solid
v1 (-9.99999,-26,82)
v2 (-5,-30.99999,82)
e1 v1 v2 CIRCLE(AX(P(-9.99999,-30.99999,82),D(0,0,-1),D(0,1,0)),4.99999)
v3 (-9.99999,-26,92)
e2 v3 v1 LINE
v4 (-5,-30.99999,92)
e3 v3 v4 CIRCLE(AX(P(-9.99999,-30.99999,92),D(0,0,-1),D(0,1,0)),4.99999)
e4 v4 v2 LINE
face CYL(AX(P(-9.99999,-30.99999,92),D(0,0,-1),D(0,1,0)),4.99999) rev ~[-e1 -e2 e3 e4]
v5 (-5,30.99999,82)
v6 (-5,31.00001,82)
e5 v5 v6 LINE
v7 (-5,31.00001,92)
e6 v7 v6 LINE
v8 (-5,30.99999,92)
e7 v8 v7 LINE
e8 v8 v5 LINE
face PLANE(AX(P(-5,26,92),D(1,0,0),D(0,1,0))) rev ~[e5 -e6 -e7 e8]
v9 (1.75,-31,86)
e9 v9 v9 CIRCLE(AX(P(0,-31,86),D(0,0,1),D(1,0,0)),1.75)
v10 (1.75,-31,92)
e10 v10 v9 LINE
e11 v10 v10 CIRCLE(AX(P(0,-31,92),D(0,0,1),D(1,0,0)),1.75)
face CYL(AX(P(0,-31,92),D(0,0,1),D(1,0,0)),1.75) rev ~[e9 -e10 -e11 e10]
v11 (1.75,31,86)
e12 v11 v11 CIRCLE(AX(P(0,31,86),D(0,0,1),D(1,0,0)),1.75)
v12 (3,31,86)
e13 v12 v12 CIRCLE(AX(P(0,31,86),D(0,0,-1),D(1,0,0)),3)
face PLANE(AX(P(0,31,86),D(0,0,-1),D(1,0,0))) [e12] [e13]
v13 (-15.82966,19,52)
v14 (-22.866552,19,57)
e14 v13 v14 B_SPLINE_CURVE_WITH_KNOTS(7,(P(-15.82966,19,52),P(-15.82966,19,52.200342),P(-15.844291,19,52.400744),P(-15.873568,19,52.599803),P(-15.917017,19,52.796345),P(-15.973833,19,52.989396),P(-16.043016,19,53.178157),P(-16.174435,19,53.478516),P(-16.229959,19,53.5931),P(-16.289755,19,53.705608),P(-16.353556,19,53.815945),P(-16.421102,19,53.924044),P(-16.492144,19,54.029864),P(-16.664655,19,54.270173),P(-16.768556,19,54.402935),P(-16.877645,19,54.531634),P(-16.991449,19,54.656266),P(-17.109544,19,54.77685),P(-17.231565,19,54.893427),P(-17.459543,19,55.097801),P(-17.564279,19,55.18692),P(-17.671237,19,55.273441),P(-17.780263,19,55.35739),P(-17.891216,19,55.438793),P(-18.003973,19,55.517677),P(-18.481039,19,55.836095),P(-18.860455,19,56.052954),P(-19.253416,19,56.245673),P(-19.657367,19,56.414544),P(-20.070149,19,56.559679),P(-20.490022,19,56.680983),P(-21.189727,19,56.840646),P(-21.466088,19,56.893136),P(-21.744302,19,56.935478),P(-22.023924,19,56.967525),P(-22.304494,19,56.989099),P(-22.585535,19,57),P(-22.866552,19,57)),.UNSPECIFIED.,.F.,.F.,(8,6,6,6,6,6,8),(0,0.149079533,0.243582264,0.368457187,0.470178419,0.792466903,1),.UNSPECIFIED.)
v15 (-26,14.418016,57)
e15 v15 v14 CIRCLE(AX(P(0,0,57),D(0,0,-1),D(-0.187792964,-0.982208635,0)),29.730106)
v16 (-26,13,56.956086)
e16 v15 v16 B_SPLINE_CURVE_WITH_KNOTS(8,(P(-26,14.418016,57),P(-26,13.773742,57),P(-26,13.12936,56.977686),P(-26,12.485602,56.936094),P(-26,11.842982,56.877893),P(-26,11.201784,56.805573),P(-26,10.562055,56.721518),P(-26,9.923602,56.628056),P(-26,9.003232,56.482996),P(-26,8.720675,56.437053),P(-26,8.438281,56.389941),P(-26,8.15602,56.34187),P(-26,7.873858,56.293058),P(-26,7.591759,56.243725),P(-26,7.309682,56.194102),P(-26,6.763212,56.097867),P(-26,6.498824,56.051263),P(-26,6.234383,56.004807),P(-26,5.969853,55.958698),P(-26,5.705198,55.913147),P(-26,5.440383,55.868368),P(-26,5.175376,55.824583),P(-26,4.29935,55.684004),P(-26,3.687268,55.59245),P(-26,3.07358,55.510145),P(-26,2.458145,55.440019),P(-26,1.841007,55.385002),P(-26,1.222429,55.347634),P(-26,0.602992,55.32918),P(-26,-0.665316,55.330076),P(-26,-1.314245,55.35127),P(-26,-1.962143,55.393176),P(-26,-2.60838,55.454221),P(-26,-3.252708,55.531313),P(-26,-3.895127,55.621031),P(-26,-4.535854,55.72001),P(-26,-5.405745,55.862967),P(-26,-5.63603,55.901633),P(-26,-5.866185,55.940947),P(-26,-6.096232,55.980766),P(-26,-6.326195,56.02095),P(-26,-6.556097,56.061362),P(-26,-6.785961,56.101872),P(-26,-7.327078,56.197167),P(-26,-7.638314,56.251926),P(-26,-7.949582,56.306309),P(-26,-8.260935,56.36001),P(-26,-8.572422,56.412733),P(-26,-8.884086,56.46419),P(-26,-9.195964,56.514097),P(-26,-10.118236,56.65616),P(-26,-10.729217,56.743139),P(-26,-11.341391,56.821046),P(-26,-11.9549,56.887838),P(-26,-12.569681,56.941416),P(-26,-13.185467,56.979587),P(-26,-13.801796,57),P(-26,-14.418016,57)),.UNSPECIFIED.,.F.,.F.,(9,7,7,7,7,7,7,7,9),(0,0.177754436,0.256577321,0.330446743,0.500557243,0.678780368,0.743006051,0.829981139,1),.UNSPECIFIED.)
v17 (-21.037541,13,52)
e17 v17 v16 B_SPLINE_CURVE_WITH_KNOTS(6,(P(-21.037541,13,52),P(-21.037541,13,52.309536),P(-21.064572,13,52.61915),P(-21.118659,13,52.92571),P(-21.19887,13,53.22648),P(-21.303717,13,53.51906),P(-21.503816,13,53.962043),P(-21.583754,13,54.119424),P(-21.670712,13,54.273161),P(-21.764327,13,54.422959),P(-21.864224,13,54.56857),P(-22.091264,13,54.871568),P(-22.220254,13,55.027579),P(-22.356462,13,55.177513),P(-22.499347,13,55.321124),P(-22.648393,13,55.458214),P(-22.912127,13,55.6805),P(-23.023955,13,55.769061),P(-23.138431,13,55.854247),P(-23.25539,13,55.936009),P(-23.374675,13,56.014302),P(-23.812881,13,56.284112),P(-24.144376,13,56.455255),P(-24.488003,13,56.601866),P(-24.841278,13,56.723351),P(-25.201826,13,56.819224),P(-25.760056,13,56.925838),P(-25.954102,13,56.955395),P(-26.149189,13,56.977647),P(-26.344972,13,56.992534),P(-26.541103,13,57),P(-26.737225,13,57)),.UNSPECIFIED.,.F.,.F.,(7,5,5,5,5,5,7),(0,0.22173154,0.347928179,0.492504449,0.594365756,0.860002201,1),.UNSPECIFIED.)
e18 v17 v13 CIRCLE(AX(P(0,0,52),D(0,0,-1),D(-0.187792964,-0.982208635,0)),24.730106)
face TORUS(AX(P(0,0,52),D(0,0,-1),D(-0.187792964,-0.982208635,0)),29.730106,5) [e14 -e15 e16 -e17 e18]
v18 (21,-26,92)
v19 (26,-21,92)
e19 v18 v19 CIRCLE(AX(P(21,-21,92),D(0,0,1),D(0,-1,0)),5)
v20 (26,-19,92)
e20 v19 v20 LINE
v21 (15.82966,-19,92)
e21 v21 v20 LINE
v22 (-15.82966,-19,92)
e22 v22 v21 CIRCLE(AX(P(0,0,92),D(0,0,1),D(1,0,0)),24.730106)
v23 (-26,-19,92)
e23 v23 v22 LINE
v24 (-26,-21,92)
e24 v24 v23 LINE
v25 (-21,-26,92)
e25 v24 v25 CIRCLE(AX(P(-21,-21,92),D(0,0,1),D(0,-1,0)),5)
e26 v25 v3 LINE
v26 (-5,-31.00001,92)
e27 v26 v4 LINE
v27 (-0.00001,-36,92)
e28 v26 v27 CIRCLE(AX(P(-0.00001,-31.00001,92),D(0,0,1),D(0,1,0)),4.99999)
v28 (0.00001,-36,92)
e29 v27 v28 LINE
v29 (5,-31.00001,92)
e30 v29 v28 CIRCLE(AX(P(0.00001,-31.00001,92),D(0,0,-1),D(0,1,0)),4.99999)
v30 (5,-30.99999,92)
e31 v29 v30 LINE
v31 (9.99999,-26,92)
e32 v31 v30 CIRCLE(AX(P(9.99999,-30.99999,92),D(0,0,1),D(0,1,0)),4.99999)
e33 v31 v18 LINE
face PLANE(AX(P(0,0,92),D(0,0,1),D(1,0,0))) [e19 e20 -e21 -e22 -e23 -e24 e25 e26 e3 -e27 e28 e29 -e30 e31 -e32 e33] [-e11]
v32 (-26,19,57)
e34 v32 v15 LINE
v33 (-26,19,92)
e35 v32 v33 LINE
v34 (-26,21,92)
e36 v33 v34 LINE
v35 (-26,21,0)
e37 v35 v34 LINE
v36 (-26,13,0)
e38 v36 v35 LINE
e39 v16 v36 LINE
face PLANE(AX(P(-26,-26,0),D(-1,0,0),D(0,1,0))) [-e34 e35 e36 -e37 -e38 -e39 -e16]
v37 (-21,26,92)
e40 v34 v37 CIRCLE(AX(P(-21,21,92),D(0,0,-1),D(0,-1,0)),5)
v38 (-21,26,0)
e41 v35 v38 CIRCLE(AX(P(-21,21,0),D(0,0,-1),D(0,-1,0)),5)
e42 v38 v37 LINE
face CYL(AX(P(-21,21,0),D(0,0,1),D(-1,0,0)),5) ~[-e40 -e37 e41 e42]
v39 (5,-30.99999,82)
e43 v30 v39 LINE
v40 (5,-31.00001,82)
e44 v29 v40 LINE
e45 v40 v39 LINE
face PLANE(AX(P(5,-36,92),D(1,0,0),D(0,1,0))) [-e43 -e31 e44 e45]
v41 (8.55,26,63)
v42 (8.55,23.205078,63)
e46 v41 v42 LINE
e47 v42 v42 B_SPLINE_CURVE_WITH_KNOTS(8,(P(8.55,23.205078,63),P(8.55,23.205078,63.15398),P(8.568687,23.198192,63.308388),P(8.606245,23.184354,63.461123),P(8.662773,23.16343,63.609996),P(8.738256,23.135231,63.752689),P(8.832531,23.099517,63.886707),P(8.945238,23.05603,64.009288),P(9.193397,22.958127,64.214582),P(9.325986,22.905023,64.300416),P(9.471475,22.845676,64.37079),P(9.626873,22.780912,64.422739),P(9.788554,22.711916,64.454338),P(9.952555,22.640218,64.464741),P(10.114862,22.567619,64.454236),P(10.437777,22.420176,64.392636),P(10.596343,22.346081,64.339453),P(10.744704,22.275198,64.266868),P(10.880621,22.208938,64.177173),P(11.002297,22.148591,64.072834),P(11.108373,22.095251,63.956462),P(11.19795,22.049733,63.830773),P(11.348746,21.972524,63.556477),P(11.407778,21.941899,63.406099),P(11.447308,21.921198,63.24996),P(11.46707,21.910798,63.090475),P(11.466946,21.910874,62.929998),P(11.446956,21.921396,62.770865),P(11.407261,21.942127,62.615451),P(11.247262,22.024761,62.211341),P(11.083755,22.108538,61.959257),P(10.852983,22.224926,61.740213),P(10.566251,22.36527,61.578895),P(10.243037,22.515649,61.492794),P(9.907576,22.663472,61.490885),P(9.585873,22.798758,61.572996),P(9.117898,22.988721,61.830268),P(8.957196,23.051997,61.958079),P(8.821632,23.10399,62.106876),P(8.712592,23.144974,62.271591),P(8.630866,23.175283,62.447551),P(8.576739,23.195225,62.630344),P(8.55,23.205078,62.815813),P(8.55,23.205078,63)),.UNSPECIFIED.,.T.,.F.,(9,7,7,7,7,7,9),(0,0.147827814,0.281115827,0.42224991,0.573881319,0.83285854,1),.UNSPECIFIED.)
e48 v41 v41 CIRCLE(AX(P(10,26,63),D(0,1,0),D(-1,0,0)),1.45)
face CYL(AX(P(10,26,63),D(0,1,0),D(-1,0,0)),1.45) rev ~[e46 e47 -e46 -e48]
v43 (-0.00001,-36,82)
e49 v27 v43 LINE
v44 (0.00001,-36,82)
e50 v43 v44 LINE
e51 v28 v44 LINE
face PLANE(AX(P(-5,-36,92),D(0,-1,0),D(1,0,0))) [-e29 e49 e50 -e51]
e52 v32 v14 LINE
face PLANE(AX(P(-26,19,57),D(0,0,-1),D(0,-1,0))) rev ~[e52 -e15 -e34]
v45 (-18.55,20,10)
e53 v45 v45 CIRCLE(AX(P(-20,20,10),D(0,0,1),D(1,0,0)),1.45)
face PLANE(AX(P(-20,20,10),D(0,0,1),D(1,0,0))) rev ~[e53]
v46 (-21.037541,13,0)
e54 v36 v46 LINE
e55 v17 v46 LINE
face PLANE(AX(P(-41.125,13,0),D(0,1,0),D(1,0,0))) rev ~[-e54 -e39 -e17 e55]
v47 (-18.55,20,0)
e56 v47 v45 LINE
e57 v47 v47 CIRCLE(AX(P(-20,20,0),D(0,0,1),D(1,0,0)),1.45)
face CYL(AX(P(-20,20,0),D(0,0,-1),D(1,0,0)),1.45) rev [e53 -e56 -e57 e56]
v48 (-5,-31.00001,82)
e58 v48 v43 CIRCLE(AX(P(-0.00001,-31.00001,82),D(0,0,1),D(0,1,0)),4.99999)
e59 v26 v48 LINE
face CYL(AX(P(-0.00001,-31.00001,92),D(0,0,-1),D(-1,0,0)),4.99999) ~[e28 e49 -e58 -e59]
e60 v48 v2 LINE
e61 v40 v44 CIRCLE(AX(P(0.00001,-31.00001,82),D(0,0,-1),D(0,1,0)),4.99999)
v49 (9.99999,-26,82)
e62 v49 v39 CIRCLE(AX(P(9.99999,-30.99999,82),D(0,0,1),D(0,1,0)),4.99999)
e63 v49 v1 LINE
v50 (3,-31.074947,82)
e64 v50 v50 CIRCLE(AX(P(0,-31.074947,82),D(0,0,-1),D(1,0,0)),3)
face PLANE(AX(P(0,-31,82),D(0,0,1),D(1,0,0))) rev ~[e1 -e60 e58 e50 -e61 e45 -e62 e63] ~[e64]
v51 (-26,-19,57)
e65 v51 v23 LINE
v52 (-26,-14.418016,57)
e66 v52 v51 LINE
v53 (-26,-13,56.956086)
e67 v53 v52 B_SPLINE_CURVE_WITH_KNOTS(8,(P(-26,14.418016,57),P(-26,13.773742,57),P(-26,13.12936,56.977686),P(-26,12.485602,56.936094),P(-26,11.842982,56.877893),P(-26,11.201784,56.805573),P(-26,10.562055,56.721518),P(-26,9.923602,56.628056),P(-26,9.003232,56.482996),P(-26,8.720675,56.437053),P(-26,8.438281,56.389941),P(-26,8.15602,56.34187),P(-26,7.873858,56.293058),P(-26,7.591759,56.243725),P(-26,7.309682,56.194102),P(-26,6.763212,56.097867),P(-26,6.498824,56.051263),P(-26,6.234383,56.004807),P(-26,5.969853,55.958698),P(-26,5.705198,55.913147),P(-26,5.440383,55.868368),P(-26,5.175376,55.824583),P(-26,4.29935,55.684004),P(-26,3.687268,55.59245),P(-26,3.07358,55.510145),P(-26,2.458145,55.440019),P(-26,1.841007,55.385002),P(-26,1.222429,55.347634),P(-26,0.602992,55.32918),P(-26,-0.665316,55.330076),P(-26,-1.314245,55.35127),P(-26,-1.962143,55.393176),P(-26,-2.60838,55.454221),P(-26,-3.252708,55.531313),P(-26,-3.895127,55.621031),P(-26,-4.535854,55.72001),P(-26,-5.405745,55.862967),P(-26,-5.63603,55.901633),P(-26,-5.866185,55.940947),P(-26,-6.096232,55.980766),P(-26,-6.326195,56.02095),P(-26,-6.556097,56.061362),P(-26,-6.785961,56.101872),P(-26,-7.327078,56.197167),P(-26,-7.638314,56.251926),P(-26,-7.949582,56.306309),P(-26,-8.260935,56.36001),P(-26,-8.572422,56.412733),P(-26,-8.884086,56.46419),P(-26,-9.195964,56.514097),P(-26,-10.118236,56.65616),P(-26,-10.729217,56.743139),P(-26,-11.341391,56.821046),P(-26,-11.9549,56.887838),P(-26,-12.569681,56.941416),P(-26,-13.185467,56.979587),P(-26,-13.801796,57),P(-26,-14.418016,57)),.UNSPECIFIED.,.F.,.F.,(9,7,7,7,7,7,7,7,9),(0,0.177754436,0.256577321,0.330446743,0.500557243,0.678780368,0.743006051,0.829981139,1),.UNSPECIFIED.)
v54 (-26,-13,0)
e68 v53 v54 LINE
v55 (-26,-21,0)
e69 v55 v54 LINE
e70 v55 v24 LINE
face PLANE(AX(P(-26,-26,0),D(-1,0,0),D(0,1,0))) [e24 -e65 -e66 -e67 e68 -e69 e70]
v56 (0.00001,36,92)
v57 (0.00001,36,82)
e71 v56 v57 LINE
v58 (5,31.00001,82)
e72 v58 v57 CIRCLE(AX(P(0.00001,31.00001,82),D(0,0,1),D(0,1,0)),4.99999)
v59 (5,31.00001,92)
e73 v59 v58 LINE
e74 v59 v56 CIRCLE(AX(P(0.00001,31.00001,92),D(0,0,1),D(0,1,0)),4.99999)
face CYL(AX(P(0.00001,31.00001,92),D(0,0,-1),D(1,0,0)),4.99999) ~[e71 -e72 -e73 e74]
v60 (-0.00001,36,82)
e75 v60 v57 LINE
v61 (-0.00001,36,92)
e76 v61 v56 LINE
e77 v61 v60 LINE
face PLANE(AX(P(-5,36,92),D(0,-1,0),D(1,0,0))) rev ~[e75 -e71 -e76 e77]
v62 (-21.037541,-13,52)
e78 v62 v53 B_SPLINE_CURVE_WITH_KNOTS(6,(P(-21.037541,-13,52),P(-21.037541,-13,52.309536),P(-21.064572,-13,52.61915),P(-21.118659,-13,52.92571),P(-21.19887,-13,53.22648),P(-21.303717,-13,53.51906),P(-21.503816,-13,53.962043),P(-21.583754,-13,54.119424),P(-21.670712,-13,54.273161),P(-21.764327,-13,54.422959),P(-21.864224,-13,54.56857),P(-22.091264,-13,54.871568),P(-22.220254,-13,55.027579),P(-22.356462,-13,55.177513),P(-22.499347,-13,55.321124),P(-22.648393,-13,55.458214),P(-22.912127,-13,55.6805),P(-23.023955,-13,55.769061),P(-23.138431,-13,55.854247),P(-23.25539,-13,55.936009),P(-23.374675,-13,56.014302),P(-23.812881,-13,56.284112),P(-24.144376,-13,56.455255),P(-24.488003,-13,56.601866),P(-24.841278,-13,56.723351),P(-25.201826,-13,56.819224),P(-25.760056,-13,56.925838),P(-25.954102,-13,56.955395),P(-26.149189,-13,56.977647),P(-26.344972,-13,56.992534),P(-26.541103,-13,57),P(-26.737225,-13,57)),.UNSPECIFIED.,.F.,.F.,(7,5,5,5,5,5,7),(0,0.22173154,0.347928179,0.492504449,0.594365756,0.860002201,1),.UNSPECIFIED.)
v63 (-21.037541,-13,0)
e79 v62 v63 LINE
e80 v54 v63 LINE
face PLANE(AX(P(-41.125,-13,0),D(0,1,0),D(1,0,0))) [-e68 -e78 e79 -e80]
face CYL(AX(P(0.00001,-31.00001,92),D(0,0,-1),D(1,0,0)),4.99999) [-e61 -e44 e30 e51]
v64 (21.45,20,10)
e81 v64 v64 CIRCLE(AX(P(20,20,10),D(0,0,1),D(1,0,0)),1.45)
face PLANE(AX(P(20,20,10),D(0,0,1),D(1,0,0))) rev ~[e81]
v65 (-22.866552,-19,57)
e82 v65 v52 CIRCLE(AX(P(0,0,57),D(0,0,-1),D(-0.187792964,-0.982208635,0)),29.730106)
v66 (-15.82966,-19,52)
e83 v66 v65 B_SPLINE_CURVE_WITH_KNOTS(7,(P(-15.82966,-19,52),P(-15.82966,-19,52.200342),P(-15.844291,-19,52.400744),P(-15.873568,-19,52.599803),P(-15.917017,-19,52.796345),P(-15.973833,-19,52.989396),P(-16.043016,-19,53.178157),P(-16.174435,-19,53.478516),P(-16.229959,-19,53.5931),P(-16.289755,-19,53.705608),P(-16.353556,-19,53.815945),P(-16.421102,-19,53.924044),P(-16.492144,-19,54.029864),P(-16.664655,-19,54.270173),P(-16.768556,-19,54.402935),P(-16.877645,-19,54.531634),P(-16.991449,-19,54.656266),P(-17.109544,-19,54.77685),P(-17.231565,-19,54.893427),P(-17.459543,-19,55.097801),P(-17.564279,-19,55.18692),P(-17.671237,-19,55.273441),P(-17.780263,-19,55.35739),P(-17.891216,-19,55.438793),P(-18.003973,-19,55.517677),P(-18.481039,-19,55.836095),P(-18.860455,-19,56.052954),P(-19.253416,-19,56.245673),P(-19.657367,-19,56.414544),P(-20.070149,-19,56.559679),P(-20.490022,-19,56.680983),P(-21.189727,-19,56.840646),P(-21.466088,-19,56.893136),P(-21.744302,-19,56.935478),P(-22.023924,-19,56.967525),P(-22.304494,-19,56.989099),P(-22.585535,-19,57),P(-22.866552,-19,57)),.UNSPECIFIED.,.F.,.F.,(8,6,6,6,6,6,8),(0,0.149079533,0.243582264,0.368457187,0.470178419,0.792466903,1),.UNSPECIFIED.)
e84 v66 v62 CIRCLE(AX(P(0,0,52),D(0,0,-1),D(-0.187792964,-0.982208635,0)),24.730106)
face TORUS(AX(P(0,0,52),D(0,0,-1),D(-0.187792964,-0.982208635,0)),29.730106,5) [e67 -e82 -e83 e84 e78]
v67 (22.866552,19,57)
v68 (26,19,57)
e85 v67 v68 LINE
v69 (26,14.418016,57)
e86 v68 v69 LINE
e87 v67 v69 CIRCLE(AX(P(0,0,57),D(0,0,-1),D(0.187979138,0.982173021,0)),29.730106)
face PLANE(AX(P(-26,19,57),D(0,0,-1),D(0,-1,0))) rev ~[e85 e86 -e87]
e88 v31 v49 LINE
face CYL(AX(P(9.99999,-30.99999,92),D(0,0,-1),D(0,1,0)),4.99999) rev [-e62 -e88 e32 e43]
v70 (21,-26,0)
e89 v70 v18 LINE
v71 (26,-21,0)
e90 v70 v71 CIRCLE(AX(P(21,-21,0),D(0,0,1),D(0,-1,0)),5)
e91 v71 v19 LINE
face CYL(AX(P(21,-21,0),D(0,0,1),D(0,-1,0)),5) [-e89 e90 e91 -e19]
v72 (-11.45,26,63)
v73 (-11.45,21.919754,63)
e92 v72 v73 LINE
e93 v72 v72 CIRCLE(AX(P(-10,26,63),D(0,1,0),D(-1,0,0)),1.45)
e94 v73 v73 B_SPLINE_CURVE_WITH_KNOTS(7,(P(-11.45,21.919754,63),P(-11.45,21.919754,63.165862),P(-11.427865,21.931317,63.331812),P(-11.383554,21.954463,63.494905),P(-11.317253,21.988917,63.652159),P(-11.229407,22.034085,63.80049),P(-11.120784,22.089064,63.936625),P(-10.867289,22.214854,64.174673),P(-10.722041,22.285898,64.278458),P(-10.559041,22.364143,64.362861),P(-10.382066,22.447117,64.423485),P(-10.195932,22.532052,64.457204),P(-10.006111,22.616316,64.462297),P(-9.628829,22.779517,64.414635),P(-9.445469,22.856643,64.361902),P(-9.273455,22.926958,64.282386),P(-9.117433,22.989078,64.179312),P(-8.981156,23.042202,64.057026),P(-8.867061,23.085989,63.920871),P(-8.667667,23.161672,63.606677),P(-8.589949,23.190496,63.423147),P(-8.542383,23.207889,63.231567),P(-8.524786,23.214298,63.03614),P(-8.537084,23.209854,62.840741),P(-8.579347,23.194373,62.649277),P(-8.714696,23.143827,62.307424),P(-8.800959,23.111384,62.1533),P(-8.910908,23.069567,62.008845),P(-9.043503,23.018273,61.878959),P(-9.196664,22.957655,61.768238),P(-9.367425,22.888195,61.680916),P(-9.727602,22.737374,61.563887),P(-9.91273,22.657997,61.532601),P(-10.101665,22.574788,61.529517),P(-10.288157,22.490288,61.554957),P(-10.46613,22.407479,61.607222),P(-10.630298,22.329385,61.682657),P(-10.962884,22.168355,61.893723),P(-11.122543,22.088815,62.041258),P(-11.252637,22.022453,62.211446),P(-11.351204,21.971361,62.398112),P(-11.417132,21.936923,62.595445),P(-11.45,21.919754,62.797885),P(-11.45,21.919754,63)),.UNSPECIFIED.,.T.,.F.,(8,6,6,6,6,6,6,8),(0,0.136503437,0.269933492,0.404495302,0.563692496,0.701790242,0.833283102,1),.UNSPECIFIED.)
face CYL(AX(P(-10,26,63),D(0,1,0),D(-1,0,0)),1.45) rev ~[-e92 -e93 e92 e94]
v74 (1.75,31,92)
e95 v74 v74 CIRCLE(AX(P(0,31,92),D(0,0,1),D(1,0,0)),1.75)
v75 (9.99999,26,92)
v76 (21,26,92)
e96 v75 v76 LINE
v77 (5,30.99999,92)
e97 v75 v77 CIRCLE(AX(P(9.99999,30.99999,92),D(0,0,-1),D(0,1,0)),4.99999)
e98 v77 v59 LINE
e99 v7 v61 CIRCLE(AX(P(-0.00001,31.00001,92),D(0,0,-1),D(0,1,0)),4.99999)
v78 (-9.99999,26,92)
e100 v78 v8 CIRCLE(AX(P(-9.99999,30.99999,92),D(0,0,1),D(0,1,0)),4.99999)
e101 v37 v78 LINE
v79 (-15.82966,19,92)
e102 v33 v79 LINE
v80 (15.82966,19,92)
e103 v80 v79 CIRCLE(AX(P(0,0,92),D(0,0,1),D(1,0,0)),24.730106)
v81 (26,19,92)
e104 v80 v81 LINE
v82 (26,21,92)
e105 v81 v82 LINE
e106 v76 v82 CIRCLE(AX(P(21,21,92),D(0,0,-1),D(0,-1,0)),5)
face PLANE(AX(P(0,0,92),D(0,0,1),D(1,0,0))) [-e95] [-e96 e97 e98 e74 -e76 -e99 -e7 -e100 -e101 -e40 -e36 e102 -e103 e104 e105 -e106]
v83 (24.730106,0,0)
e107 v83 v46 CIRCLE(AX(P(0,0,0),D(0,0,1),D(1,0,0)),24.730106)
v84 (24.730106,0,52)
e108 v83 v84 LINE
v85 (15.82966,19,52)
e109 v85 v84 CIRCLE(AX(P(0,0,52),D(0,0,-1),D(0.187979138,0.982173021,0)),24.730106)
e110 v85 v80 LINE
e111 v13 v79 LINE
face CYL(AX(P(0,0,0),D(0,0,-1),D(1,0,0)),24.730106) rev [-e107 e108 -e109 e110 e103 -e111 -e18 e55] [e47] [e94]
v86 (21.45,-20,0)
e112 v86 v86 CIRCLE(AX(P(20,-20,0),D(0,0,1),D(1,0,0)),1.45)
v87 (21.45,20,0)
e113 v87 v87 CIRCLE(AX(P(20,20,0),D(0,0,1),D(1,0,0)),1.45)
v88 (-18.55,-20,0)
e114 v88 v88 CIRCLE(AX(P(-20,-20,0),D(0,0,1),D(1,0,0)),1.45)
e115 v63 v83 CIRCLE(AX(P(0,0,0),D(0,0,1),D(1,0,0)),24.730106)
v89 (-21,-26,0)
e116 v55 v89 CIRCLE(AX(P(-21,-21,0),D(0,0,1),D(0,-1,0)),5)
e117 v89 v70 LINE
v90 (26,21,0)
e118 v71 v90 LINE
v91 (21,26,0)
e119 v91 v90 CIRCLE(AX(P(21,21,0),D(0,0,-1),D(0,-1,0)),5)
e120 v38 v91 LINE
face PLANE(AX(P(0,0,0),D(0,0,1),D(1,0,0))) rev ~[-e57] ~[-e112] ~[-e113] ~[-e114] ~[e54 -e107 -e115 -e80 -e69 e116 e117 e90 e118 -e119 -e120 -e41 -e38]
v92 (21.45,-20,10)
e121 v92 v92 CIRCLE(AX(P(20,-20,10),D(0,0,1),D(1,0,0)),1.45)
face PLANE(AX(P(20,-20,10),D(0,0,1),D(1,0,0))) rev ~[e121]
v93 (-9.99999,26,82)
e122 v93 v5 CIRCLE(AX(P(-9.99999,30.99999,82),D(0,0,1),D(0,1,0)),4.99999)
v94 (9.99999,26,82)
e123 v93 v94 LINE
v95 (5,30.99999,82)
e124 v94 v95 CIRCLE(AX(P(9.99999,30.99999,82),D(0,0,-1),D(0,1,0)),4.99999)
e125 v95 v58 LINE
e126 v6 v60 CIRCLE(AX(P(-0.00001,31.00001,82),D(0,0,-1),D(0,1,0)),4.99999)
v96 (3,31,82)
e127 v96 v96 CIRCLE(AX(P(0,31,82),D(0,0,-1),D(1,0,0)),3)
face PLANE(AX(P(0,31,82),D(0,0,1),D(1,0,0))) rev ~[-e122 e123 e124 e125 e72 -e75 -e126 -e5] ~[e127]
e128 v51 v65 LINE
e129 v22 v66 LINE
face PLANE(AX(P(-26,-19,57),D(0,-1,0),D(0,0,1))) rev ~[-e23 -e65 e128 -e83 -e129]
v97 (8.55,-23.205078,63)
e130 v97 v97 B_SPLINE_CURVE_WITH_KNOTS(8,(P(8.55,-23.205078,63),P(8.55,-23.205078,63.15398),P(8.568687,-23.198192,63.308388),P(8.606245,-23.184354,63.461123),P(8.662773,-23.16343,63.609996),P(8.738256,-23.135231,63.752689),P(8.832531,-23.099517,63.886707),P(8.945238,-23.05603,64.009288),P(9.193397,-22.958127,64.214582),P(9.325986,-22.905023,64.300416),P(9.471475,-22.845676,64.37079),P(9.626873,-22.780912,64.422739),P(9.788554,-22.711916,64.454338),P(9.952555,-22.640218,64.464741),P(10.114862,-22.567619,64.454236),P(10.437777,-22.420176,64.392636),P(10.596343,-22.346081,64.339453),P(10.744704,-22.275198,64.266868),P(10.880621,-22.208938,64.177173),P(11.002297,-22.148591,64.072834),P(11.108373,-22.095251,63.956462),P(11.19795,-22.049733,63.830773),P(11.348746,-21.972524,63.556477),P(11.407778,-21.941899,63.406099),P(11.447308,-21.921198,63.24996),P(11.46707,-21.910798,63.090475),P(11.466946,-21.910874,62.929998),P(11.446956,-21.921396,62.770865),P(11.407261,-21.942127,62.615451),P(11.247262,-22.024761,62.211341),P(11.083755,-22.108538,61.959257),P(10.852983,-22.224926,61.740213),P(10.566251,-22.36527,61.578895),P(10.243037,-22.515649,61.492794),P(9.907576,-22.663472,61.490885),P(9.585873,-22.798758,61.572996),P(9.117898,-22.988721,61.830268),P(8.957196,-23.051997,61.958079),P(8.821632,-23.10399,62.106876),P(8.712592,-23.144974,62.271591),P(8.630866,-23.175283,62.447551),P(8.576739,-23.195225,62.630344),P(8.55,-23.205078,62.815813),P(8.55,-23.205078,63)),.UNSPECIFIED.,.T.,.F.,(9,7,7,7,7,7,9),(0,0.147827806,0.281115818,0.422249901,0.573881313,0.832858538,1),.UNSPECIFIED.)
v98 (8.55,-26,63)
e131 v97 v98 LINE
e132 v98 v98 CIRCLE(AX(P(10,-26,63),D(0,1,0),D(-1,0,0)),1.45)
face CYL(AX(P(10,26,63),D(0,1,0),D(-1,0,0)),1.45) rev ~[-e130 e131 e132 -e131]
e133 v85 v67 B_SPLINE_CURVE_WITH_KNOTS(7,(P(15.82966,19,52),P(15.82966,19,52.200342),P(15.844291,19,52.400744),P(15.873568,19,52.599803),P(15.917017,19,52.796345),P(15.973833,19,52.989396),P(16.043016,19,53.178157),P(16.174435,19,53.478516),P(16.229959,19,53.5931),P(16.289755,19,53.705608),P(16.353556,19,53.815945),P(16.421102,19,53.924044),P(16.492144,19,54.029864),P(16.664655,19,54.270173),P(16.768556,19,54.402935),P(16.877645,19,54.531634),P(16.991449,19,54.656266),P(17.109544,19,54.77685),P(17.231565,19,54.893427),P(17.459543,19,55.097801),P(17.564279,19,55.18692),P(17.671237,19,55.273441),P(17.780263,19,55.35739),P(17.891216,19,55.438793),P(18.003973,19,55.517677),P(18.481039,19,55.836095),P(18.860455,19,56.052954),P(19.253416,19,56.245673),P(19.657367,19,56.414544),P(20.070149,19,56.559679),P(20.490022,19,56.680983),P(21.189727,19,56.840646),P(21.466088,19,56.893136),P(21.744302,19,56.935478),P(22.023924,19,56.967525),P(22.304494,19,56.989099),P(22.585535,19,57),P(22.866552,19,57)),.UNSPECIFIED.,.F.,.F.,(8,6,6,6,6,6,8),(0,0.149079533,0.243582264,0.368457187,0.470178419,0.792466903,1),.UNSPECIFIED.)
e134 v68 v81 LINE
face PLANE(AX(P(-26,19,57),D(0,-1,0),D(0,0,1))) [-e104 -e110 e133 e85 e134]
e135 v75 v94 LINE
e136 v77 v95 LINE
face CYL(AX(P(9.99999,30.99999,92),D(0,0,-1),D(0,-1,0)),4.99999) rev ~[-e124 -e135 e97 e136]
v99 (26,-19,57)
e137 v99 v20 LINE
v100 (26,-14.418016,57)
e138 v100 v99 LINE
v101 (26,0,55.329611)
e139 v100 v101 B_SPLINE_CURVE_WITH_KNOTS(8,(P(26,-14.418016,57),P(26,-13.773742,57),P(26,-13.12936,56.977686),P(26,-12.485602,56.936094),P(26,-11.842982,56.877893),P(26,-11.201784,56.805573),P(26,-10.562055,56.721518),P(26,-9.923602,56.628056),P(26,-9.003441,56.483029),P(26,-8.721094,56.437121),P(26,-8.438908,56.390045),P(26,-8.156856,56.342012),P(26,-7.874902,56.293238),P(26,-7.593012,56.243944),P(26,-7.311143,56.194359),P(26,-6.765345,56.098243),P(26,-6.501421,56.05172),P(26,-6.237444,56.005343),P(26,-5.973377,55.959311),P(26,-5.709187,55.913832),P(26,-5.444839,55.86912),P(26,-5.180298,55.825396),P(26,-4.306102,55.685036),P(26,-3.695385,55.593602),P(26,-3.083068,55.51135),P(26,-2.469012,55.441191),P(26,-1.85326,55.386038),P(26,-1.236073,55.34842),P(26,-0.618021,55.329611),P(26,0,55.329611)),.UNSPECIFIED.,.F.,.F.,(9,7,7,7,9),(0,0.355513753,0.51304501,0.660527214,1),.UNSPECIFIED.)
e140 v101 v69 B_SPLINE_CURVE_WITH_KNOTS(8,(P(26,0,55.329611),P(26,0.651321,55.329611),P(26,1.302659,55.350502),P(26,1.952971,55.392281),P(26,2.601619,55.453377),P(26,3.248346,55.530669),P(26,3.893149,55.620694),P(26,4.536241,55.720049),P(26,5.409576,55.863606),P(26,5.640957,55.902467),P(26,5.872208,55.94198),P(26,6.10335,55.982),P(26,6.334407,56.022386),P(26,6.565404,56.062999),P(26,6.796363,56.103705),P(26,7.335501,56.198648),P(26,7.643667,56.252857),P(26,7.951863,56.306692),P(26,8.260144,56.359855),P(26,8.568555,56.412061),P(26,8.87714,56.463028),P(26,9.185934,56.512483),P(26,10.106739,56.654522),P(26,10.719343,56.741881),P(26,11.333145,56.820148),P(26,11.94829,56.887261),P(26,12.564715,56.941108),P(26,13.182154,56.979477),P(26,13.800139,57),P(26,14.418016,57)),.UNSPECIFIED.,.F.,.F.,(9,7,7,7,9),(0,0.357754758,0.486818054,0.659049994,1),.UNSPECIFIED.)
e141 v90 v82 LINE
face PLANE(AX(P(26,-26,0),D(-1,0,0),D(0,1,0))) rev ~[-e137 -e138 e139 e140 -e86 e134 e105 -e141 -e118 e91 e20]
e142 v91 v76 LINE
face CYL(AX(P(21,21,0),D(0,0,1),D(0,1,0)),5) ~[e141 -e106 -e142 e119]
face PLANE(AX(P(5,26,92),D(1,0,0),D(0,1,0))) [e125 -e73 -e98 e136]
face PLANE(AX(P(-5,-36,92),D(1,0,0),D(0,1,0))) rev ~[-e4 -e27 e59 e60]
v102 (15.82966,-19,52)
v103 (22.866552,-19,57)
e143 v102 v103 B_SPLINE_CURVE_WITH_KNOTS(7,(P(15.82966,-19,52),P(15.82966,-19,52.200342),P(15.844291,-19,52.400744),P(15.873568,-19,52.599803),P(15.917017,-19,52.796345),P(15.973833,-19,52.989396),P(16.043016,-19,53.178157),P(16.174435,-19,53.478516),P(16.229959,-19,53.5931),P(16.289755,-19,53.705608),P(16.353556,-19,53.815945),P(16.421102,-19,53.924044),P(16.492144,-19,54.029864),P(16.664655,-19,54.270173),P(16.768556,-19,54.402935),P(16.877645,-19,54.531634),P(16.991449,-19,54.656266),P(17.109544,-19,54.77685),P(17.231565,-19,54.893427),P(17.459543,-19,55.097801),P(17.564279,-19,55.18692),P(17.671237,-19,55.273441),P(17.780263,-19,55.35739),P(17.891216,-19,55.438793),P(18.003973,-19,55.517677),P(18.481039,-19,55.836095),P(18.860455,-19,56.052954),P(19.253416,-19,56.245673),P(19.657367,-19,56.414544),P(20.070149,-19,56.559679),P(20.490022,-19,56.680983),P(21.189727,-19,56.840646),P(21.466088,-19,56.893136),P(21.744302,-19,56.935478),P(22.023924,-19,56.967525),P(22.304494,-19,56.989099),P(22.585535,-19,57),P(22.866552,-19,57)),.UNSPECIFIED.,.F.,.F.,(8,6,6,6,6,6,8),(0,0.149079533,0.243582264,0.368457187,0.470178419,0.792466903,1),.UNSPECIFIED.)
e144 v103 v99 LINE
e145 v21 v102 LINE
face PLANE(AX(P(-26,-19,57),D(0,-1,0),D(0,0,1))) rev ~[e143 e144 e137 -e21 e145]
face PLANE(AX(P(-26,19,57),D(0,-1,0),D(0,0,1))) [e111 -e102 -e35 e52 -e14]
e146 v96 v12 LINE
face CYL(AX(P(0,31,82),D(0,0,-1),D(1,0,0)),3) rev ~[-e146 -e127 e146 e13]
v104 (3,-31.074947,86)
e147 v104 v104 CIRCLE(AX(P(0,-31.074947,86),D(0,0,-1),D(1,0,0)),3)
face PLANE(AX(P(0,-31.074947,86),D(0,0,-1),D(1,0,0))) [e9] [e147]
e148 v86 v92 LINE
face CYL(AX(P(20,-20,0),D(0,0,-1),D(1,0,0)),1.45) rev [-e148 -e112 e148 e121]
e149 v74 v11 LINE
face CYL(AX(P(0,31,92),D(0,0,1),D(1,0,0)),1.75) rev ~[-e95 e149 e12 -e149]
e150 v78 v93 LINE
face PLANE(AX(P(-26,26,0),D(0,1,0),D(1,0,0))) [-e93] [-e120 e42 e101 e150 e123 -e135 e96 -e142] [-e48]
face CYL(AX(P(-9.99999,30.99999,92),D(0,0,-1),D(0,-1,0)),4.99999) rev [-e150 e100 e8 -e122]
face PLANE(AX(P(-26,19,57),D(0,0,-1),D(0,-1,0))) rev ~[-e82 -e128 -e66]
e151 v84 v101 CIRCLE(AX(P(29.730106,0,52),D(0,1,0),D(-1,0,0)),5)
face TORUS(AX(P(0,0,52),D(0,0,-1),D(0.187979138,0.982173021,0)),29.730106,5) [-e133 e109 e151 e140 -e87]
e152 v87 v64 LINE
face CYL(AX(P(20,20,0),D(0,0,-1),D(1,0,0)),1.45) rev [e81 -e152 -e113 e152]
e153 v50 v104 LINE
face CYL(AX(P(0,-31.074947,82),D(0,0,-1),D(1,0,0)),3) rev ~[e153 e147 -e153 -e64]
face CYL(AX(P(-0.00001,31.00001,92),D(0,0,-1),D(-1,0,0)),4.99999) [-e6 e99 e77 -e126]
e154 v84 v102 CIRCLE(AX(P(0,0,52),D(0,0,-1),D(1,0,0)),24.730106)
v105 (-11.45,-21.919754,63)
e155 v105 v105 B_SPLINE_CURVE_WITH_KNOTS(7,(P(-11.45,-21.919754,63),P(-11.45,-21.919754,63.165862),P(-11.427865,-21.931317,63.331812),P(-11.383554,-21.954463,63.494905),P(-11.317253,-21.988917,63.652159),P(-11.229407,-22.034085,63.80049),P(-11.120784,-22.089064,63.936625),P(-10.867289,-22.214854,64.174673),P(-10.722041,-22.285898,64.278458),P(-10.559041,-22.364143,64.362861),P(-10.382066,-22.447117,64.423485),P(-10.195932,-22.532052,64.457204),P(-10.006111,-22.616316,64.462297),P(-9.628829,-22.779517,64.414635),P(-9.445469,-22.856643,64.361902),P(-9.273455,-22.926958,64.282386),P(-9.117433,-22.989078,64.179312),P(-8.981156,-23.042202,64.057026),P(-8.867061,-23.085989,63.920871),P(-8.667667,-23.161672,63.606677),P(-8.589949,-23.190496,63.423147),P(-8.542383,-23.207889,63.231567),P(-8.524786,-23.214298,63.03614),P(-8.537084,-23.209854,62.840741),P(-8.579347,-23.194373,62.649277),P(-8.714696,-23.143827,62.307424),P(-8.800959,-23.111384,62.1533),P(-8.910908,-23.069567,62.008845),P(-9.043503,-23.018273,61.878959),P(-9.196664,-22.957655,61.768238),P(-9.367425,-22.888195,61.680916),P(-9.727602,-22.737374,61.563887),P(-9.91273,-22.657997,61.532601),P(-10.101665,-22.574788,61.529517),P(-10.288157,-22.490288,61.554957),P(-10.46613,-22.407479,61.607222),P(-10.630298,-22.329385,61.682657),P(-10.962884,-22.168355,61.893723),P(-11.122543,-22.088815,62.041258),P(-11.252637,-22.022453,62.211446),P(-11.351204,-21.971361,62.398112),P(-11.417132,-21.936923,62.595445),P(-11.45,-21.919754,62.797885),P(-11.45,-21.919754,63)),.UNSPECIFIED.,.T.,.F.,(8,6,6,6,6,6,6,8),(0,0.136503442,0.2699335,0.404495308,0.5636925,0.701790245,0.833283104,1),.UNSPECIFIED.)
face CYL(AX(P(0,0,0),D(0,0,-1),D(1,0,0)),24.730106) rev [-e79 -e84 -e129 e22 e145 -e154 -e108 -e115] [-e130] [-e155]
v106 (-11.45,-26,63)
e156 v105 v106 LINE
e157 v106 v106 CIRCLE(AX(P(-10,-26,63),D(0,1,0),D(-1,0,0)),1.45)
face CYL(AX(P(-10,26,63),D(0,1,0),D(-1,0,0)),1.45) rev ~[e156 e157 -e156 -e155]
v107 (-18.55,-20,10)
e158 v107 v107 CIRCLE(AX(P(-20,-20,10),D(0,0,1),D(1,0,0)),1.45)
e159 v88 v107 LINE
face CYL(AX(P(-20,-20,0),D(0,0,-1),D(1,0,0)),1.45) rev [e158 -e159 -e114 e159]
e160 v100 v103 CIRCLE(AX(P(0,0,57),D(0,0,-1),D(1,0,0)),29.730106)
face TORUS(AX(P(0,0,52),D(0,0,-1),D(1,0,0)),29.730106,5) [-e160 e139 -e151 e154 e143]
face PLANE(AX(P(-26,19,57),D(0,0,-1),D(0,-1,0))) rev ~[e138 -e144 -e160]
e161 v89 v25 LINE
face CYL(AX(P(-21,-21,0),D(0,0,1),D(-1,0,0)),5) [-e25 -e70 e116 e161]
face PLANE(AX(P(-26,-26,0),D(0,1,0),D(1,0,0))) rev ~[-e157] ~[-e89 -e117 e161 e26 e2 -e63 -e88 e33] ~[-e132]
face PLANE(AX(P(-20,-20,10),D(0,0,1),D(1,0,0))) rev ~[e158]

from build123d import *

# Parameters (mm, degrees)
F0_W         = 52
F0_H         = 52
F0_R         = 24.7301056407
F1_DEPTH     = 92
F2_W         = 38
F2_H         = 35
F3_DEPTH     = 52.001
F4_R         = 5
F5_T4_ANGLE  = 79.1651275765
F5_T9_ANGLE  = 158.3519759407
F5_T15_ANGLE = 79.1651275765
F6_R         = 1.45
F7_DEPTH     = 10
F8_R         = 1.45
F9_DEPTH     = 52.001
F10_W        = 25
F10_H        = 26
F11_DEPTH    = 92.0010001
F12_W        = 10
F12_H        = 10
F12_R        = 1.75
F13_DEPTH    = 10
F14_R        = 4.99999
F15_R        = 3
F16_DEPTH    = 4


# Not quite as in the source:
# - a fillet or chamfer that OpenCascade refuses, or shapes differently, is made with other operations: its cross-section is extruded or revolved along the edge and cut away or added
# - a fillet or chamfer is up to 0.001 mm smaller than in the source, because OpenCascade refuses the exact size


with BuildPart() as f1:
    # F0 (on Top) → F1 (new body)
    with BuildSketch(Plane.XY):
        Rectangle(F0_W, F0_H)
        Circle(F0_R, mode=Mode.SUBTRACT)
    extrude(amount=F1_DEPTH)

    # F2 (on face) → F3 (cut, through all)
    with BuildSketch(Plane(origin=(-26, 0, 0), x_dir=(0, -1, 0), z_dir=(-1, 0, 0))):
        with Locations((0, 74.5)):
            Rectangle(F2_W, F2_H)
    extrude(amount=-F3_DEPTH, mode=Mode.SUBTRACT)

    # F4
    f4_edges = [f1.edges().sort_by_distance(p)[0] for p in [
        (-26, 26, 46),
        (-26, -26, 46),
        (26, 26, 46),
        (26, -26, 46),
    ]]
    fillet(f4_edges, radius=F4_R)

    # F5: fillet of radius 5 on 3 edges, made by hand


with BuildPart() as f5_tool2:
    # F5_s3 → F5_t4 (revolve)
    with BuildSketch(Plane.XZ):
        with BuildLine():
            ThreePointArc((24.7301056407, 52), (26.1945717348, 55.5355339059), (29.7301056407, 57))
            Line((29.7301056407, 57), (24.7301056407, 57))
            Line((24.7301056407, 57), (24.7301056407, 52))
        make_face()
    revolve(axis=Axis((0, 0, 57), (0, 0, -1)), revolution_arc=F5_T4_ANGLE)

    split(bisect_by=Plane.XZ.offset(19), keep=Keep.BOTTOM)


with BuildPart() as f1_1:
    add(f1.part)

    # F5_t1: cut F5_tool2
    add(f5_tool2.part, mode=Mode.SUBTRACT)


with BuildPart() as f5_tool7:
    # F5_s8 → F5_t9 (revolve)
    with BuildSketch(Plane(origin=(0, 0, 0), x_dir=(0, 0, 1), z_dir=(0.982208635, -0.1877929639, 0))):
        with BuildLine():
            ThreePointArc((52, 24.7301056407), (55.5355339059, 26.1945717348), (57, 29.7301056407))
            Line((57, 29.7301056407), (57, 24.7301056407))
            Line((57, 24.7301056407), (52, 24.7301056407))
        make_face()
    revolve(axis=Axis((0, 0, 57), (0, 0, -1)), revolution_arc=F5_T9_ANGLE)

    split(bisect_by=Plane.XZ.offset(-19), keep=Keep.TOP)

    split(bisect_by=Plane.XZ.offset(19), keep=Keep.BOTTOM)


with BuildPart() as f1_2:
    add(f1_1.part)

    # F5_t6: cut F5_tool7
    add(f5_tool7.part, mode=Mode.SUBTRACT)


with BuildPart() as f5_tool13:
    # F5_s14 → F5_t15 (revolve)
    with BuildSketch(Plane(origin=(0, 0, 0), x_dir=(0, 0, 1), z_dir=(-0.9821730213, 0.1879791378, 0))):
        with BuildLine():
            ThreePointArc((52, 24.7301056407), (55.5355339059, 26.1945717348), (57, 29.7301056407))
            Line((57, 29.7301056407), (57, 24.7301056407))
            Line((57, 24.7301056407), (52, 24.7301056407))
        make_face()
    revolve(axis=Axis((0, 0, 57), (0, 0, -1)), revolution_arc=F5_T15_ANGLE)

    split(bisect_by=Plane.XZ.offset(-19), keep=Keep.TOP)


with BuildPart() as f1_3:
    add(f1_2.part)

    # F5_t12: cut F5_tool13
    add(f5_tool13.part, mode=Mode.SUBTRACT)

    # F6 (on face) → F7 (cut)
    with BuildSketch(Plane.XY):
        with Locations((-20, -20)):
            Circle(F6_R)
        with Locations((20, -20)):
            Circle(F6_R)
        with Locations((20, 20)):
            Circle(F6_R)
        with Locations((-20, 20)):
            Circle(F6_R)
    extrude(amount=F7_DEPTH, mode=Mode.SUBTRACT)

    # F8 (on face) → F9 (cut, through all)
    with BuildSketch(Plane(origin=(0, 26, 0), x_dir=(-1, 0, 0), z_dir=(0, 1, 0))):
        with Locations((-10, 63)):
            Circle(F8_R)
        with Locations((10, 63)):
            Circle(F8_R)
    extrude(amount=-F9_DEPTH, mode=Mode.SUBTRACT)

    # F10 (on face) → F11 (cut, through all)
    with BuildSketch(Plane.XY):
        with Locations((-28.625, 0)):
            Rectangle(F10_W, F10_H)
    extrude(amount=F11_DEPTH, mode=Mode.SUBTRACT)

    # F12 (on face) → F13 (join)
    with BuildSketch(Plane.XY.offset(92)):
        with Locations((0, -31)):
            Rectangle(F12_W, F12_H)
        with Locations((0, -31)):
            Circle(F12_R, mode=Mode.SUBTRACT)
        with Locations((0, 31)):
            Rectangle(F12_W, F12_H)
        with Locations((0, 31)):
            Circle(F12_R, mode=Mode.SUBTRACT)
    extrude(amount=-F13_DEPTH)

    # F14 (radius 5 in the source; OpenCascade refuses exactly that, so slightly less here)
    f14_edges = [f1_3.edges().sort_by_distance(p)[0] for p in [
        (-5, -26, 87),
        (5, -26, 87),
        (-5, 26, 87),
        (5, 26, 87),
        (5, 36, 87),
        (-5, 36, 87),
        (-5, -36, 87),
        (5, -36, 87),
    ]]
    fillet(f14_edges, radius=F14_R)

    # F15 (on face) → F16 (cut)
    with BuildSketch(Plane(origin=(0, 0, 82), x_dir=(1, 0, 0), z_dir=(0, 0, -1))):
        with Locations((0, 31.0749467462)):
            Circle(F15_R)
        with Locations((0, -31)):
            Circle(F15_R)
    extrude(amount=-F16_DEPTH, mode=Mode.SUBTRACT)


solid = f1_3.part
